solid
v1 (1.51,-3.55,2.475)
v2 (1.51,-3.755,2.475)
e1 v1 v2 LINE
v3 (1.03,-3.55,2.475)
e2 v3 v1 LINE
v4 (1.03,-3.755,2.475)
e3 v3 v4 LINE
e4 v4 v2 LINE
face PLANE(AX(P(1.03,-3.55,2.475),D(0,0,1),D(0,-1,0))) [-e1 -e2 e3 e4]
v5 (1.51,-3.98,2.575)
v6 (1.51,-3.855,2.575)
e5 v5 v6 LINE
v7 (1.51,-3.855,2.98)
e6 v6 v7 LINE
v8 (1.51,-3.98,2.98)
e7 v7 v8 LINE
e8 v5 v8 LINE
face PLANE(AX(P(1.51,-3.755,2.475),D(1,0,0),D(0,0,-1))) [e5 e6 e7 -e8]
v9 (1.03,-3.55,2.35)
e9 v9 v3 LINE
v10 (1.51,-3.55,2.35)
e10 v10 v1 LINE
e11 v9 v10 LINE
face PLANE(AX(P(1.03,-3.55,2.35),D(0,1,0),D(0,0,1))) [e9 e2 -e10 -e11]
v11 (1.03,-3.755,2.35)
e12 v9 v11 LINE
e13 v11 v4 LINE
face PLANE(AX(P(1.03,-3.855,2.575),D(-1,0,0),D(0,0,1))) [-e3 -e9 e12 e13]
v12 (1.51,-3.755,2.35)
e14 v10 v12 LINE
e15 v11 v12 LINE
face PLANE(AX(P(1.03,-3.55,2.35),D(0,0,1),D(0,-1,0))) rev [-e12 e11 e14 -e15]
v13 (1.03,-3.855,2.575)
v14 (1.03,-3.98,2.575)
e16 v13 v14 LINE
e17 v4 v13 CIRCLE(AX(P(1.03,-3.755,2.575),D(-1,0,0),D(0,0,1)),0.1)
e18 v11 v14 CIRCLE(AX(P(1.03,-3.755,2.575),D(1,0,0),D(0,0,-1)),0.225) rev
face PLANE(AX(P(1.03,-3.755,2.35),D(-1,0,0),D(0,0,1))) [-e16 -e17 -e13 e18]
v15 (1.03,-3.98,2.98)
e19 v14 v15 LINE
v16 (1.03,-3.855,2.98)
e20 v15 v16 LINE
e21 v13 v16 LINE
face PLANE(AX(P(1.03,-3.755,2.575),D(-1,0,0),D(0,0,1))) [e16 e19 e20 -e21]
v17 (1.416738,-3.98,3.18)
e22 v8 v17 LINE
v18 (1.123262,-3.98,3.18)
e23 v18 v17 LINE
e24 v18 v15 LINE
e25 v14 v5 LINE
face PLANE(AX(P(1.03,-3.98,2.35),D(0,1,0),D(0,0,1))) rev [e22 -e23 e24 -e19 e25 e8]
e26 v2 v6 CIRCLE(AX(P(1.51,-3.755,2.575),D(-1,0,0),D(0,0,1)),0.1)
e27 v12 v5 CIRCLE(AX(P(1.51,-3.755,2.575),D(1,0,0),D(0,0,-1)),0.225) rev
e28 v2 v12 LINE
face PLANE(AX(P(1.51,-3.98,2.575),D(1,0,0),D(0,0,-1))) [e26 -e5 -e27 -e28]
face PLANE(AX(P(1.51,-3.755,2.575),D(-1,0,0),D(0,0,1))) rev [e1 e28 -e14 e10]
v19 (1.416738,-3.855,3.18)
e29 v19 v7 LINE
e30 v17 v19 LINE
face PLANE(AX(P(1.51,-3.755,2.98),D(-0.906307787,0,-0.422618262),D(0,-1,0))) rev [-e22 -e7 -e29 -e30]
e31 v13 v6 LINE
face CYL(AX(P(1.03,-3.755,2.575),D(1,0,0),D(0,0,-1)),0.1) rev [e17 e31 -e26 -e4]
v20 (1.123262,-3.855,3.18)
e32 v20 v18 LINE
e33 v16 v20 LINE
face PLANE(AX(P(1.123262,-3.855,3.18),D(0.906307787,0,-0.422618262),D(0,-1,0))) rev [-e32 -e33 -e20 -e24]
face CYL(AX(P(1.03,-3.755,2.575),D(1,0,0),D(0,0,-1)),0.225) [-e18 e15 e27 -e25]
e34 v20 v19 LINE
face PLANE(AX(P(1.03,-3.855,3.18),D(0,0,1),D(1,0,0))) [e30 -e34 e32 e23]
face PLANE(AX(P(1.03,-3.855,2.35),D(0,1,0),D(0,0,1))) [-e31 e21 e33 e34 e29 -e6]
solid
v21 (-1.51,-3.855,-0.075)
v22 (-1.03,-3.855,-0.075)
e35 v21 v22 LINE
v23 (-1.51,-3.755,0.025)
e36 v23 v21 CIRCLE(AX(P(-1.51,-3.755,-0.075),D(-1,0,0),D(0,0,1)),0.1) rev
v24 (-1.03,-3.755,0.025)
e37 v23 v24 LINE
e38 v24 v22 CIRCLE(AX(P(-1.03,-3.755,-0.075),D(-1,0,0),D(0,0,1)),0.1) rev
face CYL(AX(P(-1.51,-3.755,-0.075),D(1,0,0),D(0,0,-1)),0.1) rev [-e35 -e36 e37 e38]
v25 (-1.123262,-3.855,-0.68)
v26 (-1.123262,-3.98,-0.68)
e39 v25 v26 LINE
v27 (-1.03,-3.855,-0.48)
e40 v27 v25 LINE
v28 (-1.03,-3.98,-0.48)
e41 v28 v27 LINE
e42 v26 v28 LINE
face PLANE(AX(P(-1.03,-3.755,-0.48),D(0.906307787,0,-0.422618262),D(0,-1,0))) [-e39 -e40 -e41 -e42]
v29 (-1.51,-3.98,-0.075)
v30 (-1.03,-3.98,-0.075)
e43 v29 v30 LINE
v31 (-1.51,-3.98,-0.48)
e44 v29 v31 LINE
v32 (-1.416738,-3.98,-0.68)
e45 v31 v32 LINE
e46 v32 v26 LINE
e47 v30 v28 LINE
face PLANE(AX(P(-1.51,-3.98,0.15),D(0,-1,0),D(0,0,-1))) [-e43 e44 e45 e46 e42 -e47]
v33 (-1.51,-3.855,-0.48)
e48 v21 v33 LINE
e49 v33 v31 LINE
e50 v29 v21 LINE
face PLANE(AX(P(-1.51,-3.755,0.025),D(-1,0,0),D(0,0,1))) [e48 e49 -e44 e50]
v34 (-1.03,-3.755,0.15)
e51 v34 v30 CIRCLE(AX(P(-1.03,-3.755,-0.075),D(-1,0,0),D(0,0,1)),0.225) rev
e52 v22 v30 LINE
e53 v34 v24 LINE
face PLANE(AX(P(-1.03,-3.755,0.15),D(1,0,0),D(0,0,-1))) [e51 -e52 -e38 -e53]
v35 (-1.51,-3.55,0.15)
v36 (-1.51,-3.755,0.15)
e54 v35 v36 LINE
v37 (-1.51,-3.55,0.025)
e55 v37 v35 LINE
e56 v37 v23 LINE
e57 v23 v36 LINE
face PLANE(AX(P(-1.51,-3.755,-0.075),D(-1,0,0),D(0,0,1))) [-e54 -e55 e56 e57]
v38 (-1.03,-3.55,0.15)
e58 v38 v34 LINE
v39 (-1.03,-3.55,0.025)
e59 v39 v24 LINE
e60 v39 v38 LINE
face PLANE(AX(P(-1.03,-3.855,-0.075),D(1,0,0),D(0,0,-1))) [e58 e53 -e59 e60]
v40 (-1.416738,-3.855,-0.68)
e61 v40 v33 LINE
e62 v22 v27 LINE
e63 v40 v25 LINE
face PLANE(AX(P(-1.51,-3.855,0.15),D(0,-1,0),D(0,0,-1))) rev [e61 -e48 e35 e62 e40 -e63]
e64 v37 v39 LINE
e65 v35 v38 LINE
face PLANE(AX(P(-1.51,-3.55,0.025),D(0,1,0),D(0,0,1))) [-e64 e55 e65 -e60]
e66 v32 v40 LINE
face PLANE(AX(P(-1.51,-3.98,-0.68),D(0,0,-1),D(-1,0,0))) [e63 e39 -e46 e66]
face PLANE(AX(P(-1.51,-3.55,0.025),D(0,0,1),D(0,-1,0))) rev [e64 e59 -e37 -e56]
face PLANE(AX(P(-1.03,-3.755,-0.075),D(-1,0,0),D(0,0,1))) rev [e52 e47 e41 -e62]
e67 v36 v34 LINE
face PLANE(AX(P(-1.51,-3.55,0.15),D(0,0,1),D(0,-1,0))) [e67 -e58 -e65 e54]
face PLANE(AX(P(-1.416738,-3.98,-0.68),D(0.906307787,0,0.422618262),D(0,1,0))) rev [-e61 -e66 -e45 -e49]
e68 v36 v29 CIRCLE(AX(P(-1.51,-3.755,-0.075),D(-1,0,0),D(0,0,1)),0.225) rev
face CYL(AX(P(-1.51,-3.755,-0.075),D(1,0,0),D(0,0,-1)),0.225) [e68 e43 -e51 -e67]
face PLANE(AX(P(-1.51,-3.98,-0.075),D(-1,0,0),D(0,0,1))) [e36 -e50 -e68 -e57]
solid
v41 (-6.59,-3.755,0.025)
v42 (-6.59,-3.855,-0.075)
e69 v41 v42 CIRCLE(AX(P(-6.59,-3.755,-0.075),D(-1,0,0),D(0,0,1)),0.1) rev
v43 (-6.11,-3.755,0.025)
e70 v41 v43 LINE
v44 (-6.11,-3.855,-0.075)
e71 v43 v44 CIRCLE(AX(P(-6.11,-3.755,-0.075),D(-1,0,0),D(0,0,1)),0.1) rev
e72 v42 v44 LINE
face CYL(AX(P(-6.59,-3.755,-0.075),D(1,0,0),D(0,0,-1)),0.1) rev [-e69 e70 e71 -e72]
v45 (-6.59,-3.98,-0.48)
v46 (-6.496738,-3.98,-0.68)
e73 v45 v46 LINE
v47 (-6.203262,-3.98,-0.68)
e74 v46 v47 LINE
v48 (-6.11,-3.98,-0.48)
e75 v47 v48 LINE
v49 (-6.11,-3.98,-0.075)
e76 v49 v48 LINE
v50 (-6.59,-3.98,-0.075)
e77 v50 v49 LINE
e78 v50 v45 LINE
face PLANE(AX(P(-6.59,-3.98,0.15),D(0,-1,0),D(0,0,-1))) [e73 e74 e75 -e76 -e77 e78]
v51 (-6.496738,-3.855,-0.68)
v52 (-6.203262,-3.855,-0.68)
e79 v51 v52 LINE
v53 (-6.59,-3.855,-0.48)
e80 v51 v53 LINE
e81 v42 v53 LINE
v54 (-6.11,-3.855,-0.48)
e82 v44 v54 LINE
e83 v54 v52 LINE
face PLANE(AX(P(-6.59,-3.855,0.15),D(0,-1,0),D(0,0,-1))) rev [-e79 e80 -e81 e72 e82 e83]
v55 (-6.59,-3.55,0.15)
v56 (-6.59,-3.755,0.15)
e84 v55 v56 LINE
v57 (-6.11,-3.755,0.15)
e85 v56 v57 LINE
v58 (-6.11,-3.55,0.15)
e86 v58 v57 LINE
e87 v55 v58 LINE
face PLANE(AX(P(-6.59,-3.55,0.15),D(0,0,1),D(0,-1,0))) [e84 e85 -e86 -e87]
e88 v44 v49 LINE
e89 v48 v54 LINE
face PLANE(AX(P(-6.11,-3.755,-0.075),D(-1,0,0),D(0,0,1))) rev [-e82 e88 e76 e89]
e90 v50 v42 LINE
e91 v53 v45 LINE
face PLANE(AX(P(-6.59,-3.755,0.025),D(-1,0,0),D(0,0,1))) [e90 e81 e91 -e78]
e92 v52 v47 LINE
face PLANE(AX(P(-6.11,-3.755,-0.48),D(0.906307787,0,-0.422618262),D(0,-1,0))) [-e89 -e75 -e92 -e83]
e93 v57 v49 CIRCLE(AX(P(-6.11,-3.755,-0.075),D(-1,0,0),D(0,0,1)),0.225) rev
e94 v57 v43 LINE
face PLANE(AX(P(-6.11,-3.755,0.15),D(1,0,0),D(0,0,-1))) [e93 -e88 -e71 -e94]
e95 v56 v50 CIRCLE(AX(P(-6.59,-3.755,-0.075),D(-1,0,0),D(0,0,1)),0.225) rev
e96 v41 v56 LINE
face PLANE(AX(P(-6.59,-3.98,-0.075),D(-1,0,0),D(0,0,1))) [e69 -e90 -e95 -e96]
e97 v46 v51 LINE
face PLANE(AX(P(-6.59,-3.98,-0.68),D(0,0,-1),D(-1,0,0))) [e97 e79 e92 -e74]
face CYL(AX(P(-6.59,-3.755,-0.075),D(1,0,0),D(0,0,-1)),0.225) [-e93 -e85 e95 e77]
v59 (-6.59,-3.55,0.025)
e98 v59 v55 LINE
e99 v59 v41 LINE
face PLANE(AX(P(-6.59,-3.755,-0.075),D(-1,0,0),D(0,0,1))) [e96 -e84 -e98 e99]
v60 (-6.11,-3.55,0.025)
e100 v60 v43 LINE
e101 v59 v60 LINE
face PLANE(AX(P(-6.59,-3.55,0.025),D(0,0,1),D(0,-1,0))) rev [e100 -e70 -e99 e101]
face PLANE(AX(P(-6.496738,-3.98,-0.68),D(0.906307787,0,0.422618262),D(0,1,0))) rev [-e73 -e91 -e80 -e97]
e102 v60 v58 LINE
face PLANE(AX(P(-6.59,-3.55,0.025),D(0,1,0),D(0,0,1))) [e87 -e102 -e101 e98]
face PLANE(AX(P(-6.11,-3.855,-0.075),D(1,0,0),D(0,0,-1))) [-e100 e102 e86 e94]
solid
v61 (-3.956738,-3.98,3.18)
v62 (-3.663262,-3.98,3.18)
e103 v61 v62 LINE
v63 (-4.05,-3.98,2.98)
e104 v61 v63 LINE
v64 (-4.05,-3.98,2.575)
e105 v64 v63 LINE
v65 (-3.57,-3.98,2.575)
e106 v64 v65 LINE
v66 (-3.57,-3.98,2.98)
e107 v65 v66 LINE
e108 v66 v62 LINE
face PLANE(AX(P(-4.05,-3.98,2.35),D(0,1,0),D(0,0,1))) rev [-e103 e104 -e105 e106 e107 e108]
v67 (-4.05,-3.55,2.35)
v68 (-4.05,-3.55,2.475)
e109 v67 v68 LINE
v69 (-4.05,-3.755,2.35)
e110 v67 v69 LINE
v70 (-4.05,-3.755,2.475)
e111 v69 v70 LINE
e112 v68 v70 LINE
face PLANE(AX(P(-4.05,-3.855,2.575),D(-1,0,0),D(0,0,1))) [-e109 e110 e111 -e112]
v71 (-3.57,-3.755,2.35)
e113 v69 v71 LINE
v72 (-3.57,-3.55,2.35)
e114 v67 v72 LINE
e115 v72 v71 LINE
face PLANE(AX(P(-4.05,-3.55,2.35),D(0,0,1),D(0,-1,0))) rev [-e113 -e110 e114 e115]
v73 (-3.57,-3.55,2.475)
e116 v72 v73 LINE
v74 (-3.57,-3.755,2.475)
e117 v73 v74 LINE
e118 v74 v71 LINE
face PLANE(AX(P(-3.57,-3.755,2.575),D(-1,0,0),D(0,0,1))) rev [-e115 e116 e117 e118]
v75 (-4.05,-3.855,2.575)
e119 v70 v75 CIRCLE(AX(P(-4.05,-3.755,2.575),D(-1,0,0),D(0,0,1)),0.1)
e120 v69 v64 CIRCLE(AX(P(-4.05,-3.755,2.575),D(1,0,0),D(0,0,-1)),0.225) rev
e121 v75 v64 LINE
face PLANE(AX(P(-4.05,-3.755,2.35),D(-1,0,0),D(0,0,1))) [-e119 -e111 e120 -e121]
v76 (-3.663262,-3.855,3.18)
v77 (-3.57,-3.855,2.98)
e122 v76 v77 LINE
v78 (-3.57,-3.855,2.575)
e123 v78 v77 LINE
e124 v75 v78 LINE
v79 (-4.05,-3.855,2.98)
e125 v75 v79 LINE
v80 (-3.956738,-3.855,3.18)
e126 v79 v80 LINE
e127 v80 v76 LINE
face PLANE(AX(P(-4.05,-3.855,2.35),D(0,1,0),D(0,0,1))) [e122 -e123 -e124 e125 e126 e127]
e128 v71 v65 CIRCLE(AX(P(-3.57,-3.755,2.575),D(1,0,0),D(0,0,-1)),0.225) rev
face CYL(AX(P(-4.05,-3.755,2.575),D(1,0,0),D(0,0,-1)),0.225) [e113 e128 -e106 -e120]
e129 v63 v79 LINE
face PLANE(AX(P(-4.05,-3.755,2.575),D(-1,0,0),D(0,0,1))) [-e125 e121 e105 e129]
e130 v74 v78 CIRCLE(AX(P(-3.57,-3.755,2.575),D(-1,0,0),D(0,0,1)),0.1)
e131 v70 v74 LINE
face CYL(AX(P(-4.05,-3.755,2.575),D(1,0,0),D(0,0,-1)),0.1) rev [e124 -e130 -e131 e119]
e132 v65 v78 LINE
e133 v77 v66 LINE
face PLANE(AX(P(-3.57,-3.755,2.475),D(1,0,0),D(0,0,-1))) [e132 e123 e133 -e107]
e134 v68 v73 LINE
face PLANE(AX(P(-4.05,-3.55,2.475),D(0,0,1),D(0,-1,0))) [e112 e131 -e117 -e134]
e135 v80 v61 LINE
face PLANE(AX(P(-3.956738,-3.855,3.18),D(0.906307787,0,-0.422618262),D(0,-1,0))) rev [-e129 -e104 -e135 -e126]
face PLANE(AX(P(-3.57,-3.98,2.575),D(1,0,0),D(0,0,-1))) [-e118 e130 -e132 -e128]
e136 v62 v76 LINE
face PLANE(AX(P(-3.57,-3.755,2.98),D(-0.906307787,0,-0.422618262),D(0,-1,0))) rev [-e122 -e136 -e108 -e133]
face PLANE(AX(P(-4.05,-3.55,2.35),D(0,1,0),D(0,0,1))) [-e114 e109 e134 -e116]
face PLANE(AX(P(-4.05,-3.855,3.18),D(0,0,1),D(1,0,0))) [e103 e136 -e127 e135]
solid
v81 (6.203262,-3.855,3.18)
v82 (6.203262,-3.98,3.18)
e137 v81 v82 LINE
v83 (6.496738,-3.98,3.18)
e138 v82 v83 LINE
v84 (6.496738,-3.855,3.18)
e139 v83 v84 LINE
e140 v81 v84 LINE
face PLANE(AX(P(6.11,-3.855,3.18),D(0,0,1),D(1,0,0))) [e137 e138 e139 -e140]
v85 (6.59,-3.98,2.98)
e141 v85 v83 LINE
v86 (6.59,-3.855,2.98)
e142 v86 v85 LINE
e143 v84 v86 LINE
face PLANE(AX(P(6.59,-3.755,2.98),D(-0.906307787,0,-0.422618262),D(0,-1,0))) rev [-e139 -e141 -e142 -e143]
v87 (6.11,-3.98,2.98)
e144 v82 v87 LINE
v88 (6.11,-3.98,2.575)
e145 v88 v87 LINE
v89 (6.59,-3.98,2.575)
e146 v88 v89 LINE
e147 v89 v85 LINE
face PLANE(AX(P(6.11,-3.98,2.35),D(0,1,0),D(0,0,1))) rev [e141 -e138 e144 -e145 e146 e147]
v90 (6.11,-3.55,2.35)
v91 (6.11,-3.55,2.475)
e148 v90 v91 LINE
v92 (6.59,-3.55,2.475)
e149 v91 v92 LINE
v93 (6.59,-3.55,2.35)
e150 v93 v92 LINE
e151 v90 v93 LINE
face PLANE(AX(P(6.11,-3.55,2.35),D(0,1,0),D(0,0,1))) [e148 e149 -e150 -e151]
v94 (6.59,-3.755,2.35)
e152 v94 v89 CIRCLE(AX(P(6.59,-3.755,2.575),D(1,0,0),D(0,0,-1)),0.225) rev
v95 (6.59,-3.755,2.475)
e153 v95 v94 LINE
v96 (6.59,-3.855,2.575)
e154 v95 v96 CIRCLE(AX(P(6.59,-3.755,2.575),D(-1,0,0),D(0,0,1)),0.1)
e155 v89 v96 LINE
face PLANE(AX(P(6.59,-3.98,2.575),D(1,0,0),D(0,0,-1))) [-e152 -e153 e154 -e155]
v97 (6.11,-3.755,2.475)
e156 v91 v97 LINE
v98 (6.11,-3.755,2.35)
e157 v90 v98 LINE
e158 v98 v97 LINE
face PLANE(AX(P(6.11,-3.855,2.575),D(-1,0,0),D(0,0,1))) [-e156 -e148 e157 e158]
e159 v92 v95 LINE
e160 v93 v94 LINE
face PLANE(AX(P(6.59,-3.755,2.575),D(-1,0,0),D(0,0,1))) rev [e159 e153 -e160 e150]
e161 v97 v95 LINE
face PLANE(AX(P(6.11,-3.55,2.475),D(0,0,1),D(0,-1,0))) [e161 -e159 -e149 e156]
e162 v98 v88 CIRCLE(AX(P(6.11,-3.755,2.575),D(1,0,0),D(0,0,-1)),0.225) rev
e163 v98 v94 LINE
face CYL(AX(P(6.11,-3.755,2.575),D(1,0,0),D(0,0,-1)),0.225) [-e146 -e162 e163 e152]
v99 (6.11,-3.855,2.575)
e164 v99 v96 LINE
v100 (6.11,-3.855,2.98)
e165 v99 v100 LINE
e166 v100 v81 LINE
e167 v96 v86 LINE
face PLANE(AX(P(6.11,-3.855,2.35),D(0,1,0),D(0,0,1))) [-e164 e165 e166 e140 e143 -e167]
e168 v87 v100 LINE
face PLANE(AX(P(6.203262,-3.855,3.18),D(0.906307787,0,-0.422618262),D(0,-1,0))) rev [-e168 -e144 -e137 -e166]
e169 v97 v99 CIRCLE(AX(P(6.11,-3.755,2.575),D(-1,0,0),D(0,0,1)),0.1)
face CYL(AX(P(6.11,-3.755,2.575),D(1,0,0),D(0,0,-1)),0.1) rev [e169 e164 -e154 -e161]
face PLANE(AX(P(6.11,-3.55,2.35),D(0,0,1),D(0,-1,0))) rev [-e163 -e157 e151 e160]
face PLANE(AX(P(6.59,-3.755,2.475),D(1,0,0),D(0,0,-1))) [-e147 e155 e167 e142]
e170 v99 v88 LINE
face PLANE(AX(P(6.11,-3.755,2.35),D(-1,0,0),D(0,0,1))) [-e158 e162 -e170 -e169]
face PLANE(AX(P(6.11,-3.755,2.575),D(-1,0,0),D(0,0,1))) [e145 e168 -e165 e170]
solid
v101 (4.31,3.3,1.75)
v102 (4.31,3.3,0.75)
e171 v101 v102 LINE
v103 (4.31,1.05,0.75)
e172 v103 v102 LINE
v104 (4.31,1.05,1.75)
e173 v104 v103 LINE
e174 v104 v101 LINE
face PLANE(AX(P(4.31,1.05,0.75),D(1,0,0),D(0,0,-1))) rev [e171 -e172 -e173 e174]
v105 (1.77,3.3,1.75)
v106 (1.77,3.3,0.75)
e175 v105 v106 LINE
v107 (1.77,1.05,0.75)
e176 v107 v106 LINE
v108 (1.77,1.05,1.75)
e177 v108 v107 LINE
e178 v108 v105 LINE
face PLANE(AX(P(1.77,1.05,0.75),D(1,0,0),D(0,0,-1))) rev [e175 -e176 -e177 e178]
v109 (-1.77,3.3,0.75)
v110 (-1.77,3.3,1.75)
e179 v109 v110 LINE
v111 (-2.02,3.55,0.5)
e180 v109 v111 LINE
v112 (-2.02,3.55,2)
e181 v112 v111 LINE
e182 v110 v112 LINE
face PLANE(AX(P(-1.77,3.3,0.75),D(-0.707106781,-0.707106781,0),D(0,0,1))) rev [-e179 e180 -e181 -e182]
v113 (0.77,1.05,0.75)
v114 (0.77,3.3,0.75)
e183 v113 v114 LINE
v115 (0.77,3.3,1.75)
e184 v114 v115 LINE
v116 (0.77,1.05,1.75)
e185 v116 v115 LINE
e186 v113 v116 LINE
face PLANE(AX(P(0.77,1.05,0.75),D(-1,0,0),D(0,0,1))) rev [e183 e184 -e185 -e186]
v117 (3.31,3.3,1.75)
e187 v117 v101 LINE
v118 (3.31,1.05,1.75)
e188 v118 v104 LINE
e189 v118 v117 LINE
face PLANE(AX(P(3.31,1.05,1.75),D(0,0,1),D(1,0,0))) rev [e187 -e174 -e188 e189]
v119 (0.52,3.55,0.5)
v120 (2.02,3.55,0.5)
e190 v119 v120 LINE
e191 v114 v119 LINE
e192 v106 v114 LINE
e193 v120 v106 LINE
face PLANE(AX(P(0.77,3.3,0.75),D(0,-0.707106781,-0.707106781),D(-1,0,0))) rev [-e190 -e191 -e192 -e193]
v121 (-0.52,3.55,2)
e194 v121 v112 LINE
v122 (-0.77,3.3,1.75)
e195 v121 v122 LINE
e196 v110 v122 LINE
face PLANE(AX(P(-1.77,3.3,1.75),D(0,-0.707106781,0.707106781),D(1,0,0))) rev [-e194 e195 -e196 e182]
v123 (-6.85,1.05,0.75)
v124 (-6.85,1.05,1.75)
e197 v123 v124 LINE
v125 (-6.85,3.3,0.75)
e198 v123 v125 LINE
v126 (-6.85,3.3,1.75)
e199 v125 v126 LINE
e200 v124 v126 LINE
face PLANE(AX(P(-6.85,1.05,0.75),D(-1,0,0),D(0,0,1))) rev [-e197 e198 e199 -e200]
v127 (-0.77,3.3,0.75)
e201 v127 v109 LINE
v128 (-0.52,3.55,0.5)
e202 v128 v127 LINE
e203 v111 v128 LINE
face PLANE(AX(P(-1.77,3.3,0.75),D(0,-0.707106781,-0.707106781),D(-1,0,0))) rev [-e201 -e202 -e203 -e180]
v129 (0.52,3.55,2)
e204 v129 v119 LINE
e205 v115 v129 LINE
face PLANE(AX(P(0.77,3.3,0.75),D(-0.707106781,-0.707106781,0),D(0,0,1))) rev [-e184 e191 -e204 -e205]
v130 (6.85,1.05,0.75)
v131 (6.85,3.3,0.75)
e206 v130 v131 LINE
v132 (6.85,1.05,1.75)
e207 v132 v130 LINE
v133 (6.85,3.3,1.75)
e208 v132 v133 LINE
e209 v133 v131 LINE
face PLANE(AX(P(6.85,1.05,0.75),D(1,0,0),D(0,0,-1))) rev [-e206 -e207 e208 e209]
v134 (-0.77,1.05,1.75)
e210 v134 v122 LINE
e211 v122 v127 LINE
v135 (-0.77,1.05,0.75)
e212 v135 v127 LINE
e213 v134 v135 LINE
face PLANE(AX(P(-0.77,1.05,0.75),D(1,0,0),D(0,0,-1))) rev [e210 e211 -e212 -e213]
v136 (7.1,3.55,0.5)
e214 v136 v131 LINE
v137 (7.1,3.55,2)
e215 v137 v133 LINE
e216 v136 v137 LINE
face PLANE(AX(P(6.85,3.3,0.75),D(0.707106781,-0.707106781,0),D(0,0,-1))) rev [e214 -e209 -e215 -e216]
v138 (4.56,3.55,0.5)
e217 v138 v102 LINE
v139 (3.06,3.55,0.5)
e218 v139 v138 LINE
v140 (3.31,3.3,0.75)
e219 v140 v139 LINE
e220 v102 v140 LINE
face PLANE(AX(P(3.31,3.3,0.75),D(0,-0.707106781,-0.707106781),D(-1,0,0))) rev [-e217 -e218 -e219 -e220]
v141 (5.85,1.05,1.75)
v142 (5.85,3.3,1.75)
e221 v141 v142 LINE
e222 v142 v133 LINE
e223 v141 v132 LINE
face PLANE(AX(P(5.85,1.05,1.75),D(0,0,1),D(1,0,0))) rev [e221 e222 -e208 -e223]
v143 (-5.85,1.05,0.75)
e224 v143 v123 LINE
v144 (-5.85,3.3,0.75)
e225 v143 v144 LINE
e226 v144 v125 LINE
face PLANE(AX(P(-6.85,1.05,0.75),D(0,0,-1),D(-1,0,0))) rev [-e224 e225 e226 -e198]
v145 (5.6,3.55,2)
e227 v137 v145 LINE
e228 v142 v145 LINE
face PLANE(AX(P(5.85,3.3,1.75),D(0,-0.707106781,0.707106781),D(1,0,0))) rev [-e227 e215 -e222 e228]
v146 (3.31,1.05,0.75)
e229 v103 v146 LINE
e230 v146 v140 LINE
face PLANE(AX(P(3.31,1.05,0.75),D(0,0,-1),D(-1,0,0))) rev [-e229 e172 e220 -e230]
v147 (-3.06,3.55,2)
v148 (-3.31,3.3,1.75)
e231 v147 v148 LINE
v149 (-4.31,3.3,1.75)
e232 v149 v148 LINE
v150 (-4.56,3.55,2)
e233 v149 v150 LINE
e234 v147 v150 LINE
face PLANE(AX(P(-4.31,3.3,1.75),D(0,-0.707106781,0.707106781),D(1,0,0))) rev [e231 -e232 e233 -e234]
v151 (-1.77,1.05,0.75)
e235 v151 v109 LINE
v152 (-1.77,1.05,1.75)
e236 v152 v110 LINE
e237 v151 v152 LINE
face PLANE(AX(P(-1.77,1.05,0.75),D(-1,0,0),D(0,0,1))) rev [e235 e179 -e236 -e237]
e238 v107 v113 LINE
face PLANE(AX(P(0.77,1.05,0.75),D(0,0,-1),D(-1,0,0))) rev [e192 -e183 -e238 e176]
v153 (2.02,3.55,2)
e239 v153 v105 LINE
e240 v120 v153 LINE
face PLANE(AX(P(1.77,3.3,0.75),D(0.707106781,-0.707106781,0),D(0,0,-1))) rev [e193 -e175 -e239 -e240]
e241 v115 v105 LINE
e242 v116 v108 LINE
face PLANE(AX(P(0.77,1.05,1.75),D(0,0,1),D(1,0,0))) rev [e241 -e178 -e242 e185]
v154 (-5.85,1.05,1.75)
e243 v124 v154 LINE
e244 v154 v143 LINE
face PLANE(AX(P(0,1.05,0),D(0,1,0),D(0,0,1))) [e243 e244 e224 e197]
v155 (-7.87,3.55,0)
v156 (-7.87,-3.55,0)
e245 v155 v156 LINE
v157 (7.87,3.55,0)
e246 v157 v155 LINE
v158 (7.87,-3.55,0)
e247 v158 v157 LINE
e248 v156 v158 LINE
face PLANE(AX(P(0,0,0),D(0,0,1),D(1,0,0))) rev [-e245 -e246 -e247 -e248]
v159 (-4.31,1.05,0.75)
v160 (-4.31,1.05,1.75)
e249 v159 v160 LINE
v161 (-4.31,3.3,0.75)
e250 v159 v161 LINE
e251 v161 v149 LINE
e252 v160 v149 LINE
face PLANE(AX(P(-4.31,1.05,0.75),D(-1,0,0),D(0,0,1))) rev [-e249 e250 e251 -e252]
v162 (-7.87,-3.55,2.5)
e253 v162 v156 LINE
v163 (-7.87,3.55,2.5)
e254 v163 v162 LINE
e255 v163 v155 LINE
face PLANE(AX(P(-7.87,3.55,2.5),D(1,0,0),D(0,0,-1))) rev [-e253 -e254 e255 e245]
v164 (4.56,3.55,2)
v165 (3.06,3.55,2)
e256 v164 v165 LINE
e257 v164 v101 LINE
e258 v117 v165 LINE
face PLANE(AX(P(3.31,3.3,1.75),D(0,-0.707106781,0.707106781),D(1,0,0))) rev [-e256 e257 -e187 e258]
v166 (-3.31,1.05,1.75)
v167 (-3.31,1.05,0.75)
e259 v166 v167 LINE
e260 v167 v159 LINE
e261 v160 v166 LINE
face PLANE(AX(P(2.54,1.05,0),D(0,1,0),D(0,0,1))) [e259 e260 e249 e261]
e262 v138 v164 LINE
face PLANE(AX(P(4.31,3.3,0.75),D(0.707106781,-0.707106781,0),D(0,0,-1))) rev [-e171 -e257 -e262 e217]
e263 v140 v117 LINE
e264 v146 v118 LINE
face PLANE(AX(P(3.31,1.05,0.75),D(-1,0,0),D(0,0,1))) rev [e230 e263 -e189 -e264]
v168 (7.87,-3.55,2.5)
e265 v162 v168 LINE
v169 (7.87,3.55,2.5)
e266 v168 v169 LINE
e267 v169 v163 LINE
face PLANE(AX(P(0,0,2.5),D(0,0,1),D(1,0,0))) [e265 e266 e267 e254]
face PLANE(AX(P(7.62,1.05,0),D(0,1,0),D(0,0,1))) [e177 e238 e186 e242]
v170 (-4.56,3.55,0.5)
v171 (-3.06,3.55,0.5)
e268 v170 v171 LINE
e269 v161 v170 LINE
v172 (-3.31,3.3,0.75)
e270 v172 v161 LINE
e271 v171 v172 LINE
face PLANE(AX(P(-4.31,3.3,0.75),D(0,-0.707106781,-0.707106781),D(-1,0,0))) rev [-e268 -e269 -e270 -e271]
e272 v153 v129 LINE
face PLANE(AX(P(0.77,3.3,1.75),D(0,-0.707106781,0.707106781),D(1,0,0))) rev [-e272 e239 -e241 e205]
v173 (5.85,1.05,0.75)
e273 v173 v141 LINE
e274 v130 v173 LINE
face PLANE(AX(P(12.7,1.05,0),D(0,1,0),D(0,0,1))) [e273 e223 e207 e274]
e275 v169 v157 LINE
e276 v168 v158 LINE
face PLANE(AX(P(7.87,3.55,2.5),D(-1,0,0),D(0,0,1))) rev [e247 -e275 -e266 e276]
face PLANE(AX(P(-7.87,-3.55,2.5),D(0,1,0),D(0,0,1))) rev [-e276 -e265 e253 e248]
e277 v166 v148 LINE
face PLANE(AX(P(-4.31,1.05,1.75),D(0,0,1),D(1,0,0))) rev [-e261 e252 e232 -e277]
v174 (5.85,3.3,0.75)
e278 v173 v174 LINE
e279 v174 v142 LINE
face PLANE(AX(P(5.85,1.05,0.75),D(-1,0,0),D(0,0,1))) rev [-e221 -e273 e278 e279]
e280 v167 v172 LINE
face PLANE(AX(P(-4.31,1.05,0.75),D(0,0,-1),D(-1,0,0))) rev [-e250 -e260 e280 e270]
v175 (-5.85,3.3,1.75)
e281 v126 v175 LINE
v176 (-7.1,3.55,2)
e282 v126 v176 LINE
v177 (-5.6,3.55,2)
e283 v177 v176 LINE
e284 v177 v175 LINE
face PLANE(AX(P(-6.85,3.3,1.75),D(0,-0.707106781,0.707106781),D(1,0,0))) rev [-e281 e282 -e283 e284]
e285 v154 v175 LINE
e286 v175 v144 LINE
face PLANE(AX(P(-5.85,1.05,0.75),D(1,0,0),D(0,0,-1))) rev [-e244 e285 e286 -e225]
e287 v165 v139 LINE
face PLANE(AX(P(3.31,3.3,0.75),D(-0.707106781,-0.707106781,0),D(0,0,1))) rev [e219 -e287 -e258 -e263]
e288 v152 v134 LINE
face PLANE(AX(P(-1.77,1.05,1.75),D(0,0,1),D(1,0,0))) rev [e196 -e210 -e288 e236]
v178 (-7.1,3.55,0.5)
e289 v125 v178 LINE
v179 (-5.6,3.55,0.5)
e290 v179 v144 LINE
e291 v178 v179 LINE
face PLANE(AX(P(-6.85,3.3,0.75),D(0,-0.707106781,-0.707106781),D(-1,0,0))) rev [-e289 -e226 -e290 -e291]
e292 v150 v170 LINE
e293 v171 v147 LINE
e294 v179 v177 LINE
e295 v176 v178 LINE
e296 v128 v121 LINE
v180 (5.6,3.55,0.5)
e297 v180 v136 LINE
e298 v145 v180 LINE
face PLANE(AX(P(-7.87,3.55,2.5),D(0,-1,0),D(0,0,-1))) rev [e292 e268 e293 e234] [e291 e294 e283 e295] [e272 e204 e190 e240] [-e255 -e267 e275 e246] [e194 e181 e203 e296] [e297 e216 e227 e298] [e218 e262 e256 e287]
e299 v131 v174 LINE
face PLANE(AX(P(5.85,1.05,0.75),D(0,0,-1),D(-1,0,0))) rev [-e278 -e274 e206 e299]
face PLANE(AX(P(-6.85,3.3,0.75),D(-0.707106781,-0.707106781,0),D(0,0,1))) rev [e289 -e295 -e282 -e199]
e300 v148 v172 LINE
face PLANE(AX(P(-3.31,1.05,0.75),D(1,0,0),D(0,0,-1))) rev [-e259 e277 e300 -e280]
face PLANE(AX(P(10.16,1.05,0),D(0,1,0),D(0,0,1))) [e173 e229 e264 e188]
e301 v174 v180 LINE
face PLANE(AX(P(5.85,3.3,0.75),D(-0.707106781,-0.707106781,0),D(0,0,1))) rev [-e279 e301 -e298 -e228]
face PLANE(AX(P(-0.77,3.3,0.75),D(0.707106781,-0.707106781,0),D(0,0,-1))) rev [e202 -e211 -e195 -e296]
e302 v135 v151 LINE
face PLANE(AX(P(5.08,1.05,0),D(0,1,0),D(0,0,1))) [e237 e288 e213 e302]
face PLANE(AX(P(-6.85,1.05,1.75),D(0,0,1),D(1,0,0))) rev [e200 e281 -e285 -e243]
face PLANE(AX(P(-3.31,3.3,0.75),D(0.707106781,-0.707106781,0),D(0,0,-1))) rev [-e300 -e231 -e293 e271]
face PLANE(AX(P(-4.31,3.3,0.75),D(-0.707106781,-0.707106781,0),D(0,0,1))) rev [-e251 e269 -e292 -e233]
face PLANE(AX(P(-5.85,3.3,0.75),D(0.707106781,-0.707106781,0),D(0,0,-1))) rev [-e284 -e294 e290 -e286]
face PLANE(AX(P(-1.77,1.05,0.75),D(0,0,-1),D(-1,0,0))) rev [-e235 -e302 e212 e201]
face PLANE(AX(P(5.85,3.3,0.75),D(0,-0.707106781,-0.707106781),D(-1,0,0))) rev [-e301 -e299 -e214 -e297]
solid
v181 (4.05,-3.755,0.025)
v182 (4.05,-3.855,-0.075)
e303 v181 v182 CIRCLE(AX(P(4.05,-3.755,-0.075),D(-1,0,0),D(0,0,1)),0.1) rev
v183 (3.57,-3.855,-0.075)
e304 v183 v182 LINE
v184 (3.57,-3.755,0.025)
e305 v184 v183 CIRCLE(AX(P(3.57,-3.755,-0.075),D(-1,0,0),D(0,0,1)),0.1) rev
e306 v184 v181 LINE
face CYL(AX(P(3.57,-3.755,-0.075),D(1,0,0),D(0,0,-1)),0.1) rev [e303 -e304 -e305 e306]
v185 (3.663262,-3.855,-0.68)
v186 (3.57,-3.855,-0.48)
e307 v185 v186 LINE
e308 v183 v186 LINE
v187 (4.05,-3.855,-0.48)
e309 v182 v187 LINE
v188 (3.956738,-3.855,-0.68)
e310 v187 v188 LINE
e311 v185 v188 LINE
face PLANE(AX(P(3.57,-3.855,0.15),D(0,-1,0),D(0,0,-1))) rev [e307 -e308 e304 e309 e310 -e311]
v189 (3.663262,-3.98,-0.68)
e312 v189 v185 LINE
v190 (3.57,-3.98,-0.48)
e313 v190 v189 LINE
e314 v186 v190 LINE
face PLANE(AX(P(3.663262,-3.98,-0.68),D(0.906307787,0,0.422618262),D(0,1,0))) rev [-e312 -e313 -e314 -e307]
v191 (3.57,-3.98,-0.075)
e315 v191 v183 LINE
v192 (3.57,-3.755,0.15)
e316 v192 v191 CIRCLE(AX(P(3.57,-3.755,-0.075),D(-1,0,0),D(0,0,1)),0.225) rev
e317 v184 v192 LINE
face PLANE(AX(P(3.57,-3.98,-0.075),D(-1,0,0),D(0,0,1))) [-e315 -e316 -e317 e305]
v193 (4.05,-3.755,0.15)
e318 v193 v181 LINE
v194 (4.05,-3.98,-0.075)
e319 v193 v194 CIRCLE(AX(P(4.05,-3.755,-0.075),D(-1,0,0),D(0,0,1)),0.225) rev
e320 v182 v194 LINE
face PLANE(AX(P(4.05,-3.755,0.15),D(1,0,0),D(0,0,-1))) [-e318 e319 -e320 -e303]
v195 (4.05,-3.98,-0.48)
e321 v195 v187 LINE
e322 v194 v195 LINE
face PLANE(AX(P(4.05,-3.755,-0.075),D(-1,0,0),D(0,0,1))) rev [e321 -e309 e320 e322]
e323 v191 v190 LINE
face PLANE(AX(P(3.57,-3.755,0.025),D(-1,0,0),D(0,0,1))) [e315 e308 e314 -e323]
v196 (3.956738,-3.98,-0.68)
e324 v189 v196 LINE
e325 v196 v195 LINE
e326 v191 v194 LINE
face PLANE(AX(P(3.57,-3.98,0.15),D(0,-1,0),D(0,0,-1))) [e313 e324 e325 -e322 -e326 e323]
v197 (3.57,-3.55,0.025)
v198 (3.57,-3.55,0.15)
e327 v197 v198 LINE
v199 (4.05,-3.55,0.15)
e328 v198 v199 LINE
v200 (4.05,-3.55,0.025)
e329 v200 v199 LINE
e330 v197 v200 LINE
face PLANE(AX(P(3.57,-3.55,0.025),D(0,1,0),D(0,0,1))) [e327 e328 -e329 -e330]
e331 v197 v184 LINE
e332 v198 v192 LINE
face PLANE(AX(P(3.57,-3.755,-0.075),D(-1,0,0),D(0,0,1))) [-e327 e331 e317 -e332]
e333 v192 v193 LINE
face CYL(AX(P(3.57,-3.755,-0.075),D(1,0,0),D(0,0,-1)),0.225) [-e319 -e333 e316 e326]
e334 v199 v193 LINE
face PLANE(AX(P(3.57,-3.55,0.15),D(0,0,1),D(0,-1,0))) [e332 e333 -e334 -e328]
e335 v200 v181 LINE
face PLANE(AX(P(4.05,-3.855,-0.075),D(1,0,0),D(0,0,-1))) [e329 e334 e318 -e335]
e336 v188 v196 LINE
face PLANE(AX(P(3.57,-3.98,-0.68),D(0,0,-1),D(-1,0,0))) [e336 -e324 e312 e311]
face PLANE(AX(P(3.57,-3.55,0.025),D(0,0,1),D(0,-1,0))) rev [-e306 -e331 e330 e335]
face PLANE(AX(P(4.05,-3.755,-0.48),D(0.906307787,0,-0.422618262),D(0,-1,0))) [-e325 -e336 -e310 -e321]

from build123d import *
from OCP.BRepFilletAPI import BRepFilletAPI_MakeChamfer

# Parameters (mm, degrees)
SKETCH1_W                  = 15.74
SKETCH1_H                  = 7.1
BOSS_EXTRUDE1_DEPTH        = 2.5
SKETCH2_W                  = 1
SKETCH2_H                  = 1
CUT_EXTRUDE1_DEPTH         = 2.5
CHAMFER1_SIZE              = 0.25
LPATTERN6_COUNT            = 6
LPATTERN6_PITCH            = 2.54
CHAMFER1_OF_LPATTERN6_SIZE = 0.25
BASE_FLANGE2_DEPTH         = 0.24
BASE_FLANGE2_DEPTH_BACK    = 0.24
BASE_FLANGE3_DEPTH         = 0.24
BASE_FLANGE3_DEPTH_BACK    = 0.24
CHAMFER3_SIZE              = 0.2
CHAMFER3_SIZE2             = 0.093261532
CHAMFER4_SIZE              = 0.2
CHAMFER4_SIZE2             = 0.093261532
LPATTERN4_COUNT            = 3
LPATTERN4_PITCH            = 5.08
LPATTERN3_COUNT            = 3
LPATTERN3_PITCH            = 5.08


# Sheet-metal steps are written as plain solids
with BuildPart() as part:
    # Sketch1 → Boss-Extrude1 (new body)
    with BuildSketch(Plane.XY):
        Rectangle(SKETCH1_W, SKETCH1_H)
    extrude(amount=BOSS_EXTRUDE1_DEPTH)

    # Sketch2 → Cut-Extrude1 (cut)
    with BuildSketch(Plane(origin=(0, 3.55, 0), x_dir=(1, 0, 0), z_dir=(0, 1, 0))):
        with Locations((-6.35, -1.25)):
            Rectangle(SKETCH2_W, SKETCH2_H)
    cut_extrude1 = extrude(amount=-CUT_EXTRUDE1_DEPTH, mode=Mode.SUBTRACT)

    # Chamfer1
    chamfer1_edges = [part.edges().sort_by_distance(p)[0] for p in [
        (-5.85, 3.55, 1.25),
        (-6.35, 3.55, 0.75),
        (-6.85, 3.55, 1.25),
        (-6.35, 3.55, 1.75),
    ]]
    chamfer(chamfer1_edges, length=CHAMFER1_SIZE)

    # LPattern6: Cut-Extrude1 ×6
    with Locations(*[(i * LPATTERN6_PITCH, 0, 0) for i in range(1, LPATTERN6_COUNT)]):
        add(cut_extrude1, mode=Mode.SUBTRACT)

    # Chamfer1 of LPattern6
    chamfer1_of_lpattern6_edges = [part.edges().sort_by_distance(p)[0] for p in [
        (-3.31, 3.55, 1.25),
        (-3.81, 3.55, 0.75),
        (-4.31, 3.55, 1.25),
        (-3.81, 3.55, 1.75),
        (-0.77, 3.55, 1.25),
        (-1.27, 3.55, 0.75),
        (-1.77, 3.55, 1.25),
        (-1.27, 3.55, 1.75),
        (1.77, 3.55, 1.25),
        (1.27, 3.55, 0.75),
        (0.77, 3.55, 1.25),
        (1.27, 3.55, 1.75),
        (4.31, 3.55, 1.25),
        (3.81, 3.55, 0.75),
        (3.31, 3.55, 1.25),
        (3.81, 3.55, 1.75),
        (6.85, 3.55, 1.25),
        (6.35, 3.55, 0.75),
        (5.85, 3.55, 1.25),
        (6.35, 3.55, 1.75),
    ]]
    chamfer(chamfer1_of_lpattern6_edges, length=CHAMFER1_OF_LPATTERN6_SIZE)


with BuildPart() as body_2:
    # Sketch5 → Base-Flange2 (new, two sides: drawn at the far end of the back side and taken through both)
    with BuildSketch(Plane.ZY.offset(6.35).offset(-BASE_FLANGE2_DEPTH_BACK)):
        with BuildLine():
            Line((0.15, -3.55), (0.15, -3.755))
            ThreePointArc((0.15, -3.755), (0.084099026, -3.914099026), (-0.075, -3.98))
            Line((-0.075, -3.98), (-0.68, -3.98))
            Line((-0.68, -3.98), (-0.68, -3.855))
            Line((-0.68, -3.855), (-0.075, -3.855))
            ThreePointArc((-0.075, -3.855), (-0.004289322, -3.825710678), (0.025, -3.755))
            Line((0.025, -3.755), (0.025, -3.55))
            Line((0.025, -3.55), (0.15, -3.55))
        make_face()
    extrude(amount=BASE_FLANGE2_DEPTH + BASE_FLANGE2_DEPTH_BACK)

    # Chamfer4: one chamfer whose edges measure the first distance from different faces: ONE call of the kernel's chamfer builder (chamfer() names one face for all edges)
    chamfer4_edges_1 = [body_2.edges().sort_by_distance(p)[0] for p in [
        (-6.11, -3.9175, -0.68),
    ]]
    chamfer4_side_1 = [body_2.faces().sort_by_distance(p)[0] for p in [
        (-6.11, -3.6525, 0.034347727),
    ]]
    chamfer4_edges_2 = [body_2.edges().sort_by_distance(p)[0] for p in [
        (-6.59, -3.9175, -0.68),
    ]]
    chamfer4_side_2 = [body_2.faces().sort_by_distance(p)[0] for p in [
        (-6.59, -3.6525, 0.034347727),
    ]]
    chamfer4 = BRepFilletAPI_MakeChamfer(body_2.part.solid().wrapped)
    for e in chamfer4_edges_1:
        chamfer4.Add(CHAMFER4_SIZE, CHAMFER4_SIZE2, e.wrapped, chamfer4_side_1[0].wrapped)  # the first distance lies on this face
    for e in chamfer4_edges_2:
        chamfer4.Add(CHAMFER4_SIZE, CHAMFER4_SIZE2, e.wrapped, chamfer4_side_2[0].wrapped)  # the first distance lies on this face
    add(Compound.cast(chamfer4.Shape()), mode=Mode.REPLACE)


with BuildPart() as body_3:
    # Sketch22 → Base-Flange3 (new, two sides: drawn at the far end of the back side and taken through both)
    with BuildSketch(Plane.ZY.offset(3.81).offset(-BASE_FLANGE3_DEPTH_BACK)):
        with BuildLine():
            Line((2.35, -3.55), (2.35, -3.755))
            ThreePointArc((2.35, -3.755), (2.415900974, -3.914099026), (2.575, -3.98))
            Line((2.575, -3.98), (3.18, -3.98))
            Line((3.18, -3.98), (3.18, -3.855))
            Line((3.18, -3.855), (2.575, -3.855))
            ThreePointArc((2.575, -3.855), (2.504289322, -3.825710678), (2.475, -3.755))
            Line((2.475, -3.755), (2.475, -3.55))
            Line((2.475, -3.55), (2.35, -3.55))
        make_face()
    extrude(amount=BASE_FLANGE3_DEPTH + BASE_FLANGE3_DEPTH_BACK)

    # Chamfer3: one chamfer whose edges measure the first distance from different faces: ONE call of the kernel's chamfer builder (chamfer() names one face for all edges)
    chamfer3_edges_1 = [body_3.edges().sort_by_distance(p)[0] for p in [
        (-3.57, -3.9175, 3.18),
    ]]
    chamfer3_side_1 = [body_3.faces().sort_by_distance(p)[0] for p in [
        (-3.57, -3.6525, 2.465652273),
    ]]
    chamfer3_edges_2 = [body_3.edges().sort_by_distance(p)[0] for p in [
        (-4.05, -3.9175, 3.18),
    ]]
    chamfer3_side_2 = [body_3.faces().sort_by_distance(p)[0] for p in [
        (-4.05, -3.6525, 2.465652273),
    ]]
    chamfer3 = BRepFilletAPI_MakeChamfer(body_3.part.solid().wrapped)
    for e in chamfer3_edges_1:
        chamfer3.Add(CHAMFER3_SIZE, CHAMFER3_SIZE2, e.wrapped, chamfer3_side_1[0].wrapped)  # the first distance lies on this face
    for e in chamfer3_edges_2:
        chamfer3.Add(CHAMFER3_SIZE, CHAMFER3_SIZE2, e.wrapped, chamfer3_side_2[0].wrapped)  # the first distance lies on this face
    add(Compound.cast(chamfer3.Shape()), mode=Mode.REPLACE)


with BuildPart() as lpattern4_1:
    # LPattern4: pattern copy
    add(body_2.part.moved(Location(Vector(1, 0, 0) * (1 * LPATTERN4_PITCH))))


with BuildPart() as lpattern4_2:
    # LPattern4: pattern copy
    add(body_2.part.moved(Location(Vector(1, 0, 0) * (2 * LPATTERN4_PITCH))))


with BuildPart() as lpattern3_1:
    # LPattern3: pattern copy
    add(body_3.part.moved(Location(Vector(1, 0, 0) * (1 * LPATTERN3_PITCH))))


with BuildPart() as lpattern3_2:
    # LPattern3: pattern copy
    add(body_3.part.moved(Location(Vector(1, 0, 0) * (2 * LPATTERN3_PITCH))))


solid = Compound([part.part, body_2.part, body_3.part, lpattern4_1.part, lpattern4_2.part, lpattern3_1.part, lpattern3_2.part])
